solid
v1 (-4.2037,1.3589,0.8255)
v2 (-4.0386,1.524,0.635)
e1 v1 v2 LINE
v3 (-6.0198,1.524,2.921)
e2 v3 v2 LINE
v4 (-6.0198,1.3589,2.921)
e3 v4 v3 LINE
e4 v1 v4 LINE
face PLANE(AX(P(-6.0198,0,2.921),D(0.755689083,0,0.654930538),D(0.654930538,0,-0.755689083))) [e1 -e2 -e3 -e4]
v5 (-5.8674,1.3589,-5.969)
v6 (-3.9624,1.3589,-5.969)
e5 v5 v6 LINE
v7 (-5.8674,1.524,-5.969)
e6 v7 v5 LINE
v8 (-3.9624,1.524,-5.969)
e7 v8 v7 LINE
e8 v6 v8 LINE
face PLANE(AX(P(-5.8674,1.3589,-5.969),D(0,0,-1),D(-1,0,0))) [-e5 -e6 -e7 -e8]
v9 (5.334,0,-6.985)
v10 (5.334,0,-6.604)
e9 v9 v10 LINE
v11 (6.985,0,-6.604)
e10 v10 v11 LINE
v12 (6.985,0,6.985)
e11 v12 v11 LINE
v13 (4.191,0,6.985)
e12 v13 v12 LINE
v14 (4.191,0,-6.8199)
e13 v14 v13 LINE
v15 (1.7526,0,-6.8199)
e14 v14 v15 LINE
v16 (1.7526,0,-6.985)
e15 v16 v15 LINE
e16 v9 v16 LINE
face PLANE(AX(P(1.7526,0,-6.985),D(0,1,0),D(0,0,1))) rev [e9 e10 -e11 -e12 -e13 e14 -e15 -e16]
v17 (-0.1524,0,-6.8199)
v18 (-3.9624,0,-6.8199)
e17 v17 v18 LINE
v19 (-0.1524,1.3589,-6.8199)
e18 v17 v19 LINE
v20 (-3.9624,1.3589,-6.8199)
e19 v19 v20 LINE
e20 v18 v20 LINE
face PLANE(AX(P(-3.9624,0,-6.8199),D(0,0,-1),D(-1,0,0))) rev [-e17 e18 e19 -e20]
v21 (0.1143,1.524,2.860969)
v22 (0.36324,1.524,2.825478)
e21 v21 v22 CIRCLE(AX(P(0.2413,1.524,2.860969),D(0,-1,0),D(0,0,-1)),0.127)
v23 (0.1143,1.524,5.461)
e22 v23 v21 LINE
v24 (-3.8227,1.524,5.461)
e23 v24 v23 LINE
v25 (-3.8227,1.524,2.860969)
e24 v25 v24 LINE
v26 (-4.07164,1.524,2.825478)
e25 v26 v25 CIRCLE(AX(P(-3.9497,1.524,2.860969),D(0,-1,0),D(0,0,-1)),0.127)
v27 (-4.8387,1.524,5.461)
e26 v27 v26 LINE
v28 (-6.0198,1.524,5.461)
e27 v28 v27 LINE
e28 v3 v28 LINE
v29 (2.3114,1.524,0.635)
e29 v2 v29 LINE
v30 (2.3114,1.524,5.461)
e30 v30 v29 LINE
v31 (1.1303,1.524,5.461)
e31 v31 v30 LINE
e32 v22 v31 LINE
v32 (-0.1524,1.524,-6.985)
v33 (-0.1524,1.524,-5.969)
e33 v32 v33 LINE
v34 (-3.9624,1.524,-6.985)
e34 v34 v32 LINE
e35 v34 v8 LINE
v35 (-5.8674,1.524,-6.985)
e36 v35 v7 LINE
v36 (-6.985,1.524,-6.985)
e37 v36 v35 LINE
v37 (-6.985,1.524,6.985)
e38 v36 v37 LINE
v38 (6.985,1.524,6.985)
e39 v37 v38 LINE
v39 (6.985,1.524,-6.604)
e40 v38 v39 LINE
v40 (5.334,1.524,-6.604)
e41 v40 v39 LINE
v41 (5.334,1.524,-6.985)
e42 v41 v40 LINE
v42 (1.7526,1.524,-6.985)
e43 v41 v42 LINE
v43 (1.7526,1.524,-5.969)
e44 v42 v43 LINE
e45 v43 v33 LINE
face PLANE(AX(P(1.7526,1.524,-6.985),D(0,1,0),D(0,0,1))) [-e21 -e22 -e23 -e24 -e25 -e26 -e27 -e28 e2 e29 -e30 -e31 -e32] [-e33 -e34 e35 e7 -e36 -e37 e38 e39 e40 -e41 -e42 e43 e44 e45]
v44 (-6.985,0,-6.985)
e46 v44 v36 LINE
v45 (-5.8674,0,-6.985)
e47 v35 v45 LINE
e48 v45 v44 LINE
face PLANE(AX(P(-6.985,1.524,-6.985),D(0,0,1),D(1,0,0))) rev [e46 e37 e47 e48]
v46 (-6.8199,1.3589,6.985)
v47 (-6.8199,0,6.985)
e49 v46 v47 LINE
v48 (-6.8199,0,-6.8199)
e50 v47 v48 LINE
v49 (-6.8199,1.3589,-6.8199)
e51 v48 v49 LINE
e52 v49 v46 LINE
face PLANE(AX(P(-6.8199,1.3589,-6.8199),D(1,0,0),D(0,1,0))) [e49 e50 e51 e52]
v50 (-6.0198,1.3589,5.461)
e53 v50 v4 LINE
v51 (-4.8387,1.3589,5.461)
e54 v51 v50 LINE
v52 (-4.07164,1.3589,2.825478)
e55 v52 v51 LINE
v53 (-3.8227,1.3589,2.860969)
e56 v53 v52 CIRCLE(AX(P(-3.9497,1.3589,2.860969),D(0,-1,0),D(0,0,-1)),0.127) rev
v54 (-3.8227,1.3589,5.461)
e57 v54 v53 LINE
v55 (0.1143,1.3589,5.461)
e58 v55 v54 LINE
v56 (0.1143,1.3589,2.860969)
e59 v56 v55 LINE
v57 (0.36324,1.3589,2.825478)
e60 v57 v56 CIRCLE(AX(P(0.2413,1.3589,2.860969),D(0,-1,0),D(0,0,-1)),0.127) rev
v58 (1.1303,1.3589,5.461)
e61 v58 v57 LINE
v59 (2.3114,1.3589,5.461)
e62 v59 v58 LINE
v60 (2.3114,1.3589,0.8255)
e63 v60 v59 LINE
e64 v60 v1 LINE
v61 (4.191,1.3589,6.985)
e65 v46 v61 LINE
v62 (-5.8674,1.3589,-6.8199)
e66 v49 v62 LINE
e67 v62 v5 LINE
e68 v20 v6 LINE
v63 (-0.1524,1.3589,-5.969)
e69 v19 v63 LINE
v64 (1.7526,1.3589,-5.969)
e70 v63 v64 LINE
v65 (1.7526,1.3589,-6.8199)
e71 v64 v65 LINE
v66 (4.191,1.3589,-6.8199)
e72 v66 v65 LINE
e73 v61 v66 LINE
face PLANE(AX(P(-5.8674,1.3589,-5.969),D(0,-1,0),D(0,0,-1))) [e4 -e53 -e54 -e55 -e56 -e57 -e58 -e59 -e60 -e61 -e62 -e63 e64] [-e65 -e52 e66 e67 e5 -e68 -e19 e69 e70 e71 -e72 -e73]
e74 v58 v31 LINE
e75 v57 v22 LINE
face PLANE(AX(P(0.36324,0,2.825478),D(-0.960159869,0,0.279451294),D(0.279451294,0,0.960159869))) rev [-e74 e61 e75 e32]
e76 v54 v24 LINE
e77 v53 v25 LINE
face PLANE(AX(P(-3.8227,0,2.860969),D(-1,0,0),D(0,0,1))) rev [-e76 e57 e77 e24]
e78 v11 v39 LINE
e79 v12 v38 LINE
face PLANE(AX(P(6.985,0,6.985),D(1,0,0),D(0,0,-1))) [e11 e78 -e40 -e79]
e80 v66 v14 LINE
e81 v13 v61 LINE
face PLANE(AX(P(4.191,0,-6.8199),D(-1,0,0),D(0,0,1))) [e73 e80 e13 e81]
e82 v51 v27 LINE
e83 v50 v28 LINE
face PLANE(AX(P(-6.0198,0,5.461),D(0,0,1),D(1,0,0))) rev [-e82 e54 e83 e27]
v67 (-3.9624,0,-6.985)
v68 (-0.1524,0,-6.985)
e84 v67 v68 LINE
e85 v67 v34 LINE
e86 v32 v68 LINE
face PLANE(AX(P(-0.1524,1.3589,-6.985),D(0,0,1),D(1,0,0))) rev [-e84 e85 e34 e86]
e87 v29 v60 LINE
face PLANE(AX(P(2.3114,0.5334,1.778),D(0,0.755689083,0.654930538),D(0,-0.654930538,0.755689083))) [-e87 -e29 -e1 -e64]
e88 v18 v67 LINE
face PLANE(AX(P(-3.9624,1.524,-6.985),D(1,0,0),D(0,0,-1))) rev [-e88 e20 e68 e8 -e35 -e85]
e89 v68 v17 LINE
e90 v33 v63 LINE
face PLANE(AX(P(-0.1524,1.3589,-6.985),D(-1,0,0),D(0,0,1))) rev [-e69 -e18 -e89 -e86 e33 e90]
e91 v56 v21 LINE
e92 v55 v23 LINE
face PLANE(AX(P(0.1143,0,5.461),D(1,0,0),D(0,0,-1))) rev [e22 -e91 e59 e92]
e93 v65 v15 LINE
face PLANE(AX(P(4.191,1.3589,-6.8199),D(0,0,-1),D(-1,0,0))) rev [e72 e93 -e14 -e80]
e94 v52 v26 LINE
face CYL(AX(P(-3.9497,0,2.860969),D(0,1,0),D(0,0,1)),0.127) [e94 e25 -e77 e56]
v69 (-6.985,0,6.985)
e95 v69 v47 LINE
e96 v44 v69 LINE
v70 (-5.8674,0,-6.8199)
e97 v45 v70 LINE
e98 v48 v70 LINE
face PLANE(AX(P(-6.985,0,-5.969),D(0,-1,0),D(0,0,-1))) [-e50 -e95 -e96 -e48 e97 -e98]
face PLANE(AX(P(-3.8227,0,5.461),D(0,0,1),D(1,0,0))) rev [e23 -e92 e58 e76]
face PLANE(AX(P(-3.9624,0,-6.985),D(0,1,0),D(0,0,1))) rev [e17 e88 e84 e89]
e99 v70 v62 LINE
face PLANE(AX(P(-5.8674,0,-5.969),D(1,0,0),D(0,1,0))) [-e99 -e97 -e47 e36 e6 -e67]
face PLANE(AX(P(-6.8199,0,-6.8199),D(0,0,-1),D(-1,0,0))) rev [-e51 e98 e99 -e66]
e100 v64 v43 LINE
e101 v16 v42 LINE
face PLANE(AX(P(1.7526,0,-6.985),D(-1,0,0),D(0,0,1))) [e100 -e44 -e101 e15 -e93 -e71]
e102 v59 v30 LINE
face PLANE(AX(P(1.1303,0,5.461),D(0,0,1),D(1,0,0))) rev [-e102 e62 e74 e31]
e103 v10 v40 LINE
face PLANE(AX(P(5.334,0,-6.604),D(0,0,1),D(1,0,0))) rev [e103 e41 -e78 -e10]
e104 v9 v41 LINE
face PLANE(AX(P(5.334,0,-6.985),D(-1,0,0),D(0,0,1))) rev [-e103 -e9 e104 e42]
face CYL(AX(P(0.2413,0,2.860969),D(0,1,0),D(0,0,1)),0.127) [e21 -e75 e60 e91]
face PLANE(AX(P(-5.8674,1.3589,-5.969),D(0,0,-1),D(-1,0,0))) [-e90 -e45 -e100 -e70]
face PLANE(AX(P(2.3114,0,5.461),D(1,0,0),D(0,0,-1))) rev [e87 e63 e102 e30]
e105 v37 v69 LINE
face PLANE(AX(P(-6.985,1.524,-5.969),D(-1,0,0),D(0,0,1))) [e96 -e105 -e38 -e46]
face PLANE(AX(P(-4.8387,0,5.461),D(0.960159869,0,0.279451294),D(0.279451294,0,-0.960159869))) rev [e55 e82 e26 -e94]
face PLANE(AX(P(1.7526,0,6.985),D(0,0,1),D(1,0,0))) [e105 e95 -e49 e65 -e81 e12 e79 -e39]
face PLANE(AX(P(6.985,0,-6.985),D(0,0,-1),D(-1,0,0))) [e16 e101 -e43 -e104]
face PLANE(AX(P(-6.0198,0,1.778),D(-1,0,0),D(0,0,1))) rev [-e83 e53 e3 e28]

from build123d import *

# Parameters (mm, degrees)
SKETCH1_W           = 5.2324
SKETCH1_H           = 13.97
BOSS_EXTRUDE1_DEPTH = 1.524
BOSS_EXTRUDE2_DEPTH = 12.954
SKETCH3_W           = 1.1176
SKETCH3_H           = 1.524
BOSS_EXTRUDE3_DEPTH = 1.016
SKETCH4_W           = 3.81
SKETCH4_H           = 0.1651
BOSS_EXTRUDE4_DEPTH = 1.016
SKETCH5_W           = 3.81
SKETCH5_H           = 0.1651
BOSS_EXTRUDE5_DEPTH = 1.3589
SKETCH6_W           = 13.8049
SKETCH6_H           = 1.3589
CUT_EXTRUDE1_DEPTH  = 0.9525
SKETCH7_W           = 13.8049
SKETCH7_H           = 1.3589
CUT_EXTRUDE2_DEPTH  = 2.4384
SKETCH8_W           = 1.651
SKETCH8_H           = 0.381
CUT_EXTRUDE3_DEPTH  = 1.524
CUT_EXTRUDE4_DEPTH  = 10.995150124
CHAMFER1_SIZE       = 1.143
CHAMFER1_SIZE2      = 0.9906
CHAMFER2_SIZE       = 1.143
CHAMFER2_SIZE_2     = 0.9906


with BuildPart() as part:
    # Sketch1 → Boss-Extrude1 (new body)
    with BuildSketch(Plane(origin=(0, 1.524, 0), x_dir=(-1, 0, 0), z_dir=(0, 1, 0))):
        with Locations((-4.3688, 0)):
            Rectangle(SKETCH1_W, SKETCH1_H)
    extrude(amount=-BOSS_EXTRUDE1_DEPTH)

    # Sketch2 → Boss-Extrude2 (add)
    with BuildSketch(Plane.XY.offset(6.985)):
        Polygon((-5.8674, 1.3589), (1.7526, 1.3589), (1.7526, 1.524), (-6.985, 1.524), (-6.985, 0), (-5.8674, 0), align=None)
    extrude(amount=-BOSS_EXTRUDE2_DEPTH)

    # Sketch3 → Boss-Extrude3 (add)
    with BuildSketch(Plane(origin=(0, 0, -5.969), x_dir=(-1, 0, 0), z_dir=(0, 0, -1))):
        with Locations((6.4262, 0.762)):
            Rectangle(SKETCH3_W, SKETCH3_H)
    extrude(amount=BOSS_EXTRUDE3_DEPTH)

    # Sketch4 → Boss-Extrude4 (add)
    with BuildSketch(Plane(origin=(0, 0, -5.969), x_dir=(-1, 0, 0), z_dir=(0, 0, -1))):
        with Locations((2.0574, 1.44145)):
            Rectangle(SKETCH4_W, SKETCH4_H)
    extrude(amount=BOSS_EXTRUDE4_DEPTH)

    # Sketch5 → Boss-Extrude5 (add)
    with BuildSketch(Plane.XZ.offset(-1.3589)):
        with Locations((-2.0574, -6.90245)):
            Rectangle(SKETCH5_W, SKETCH5_H)
    extrude(amount=BOSS_EXTRUDE5_DEPTH)

    # Sketch6 → Cut-Extrude1 (cut)
    with BuildSketch(Plane(origin=(-5.8674, 0, 0), x_dir=(0, 0, -1), z_dir=(1, 0, 0))):
        with Locations((-0.08255, 0.67945)):
            Rectangle(SKETCH6_W, SKETCH6_H)
    extrude(amount=-CUT_EXTRUDE1_DEPTH, mode=Mode.SUBTRACT)

    # Sketch7 → Cut-Extrude2 (cut)
    with BuildSketch(Plane.ZY.offset(-1.7526)):
        with Locations((0.08255, 0.67945)):
            Rectangle(SKETCH7_W, SKETCH7_H)
    extrude(amount=-CUT_EXTRUDE2_DEPTH, mode=Mode.SUBTRACT)

    # Sketch8 → Cut-Extrude3 (cut)
    with BuildSketch(Plane(origin=(0, 1.524, 0), x_dir=(-1, 0, 0), z_dir=(0, 1, 0))):
        with Locations((-6.1595, -6.7945)):
            Rectangle(SKETCH8_W, SKETCH8_H)
    extrude(amount=-CUT_EXTRUDE3_DEPTH, mode=Mode.SUBTRACT)

    # Sketch9 → Cut-Extrude4 (cut, through all)
    with BuildSketch(Plane(origin=(0, 1.524, 0), x_dir=(-1, 0, 0), z_dir=(0, 1, 0))):
        with BuildLine():
            Line((3.8227, 2.860968655), (3.8227, 5.461))
            Line((3.8227, 5.461), (-0.1143, 5.461))
            Line((-0.1143, 5.461), (-0.1143, 2.860968655))
            ThreePointArc((-0.1143, 2.860968655), (-0.223375415, 2.735239942), (-0.363240303, 2.825478341))
            Line((-0.363240303, 2.825478341), (-1.1303, 5.461))
            Line((-1.1303, 5.461), (-2.3114, 5.461))
            Line((-2.3114, 5.461), (-2.3114, 1.778))
            Line((-2.3114, 1.778), (6.0198, 1.778))
            Line((6.0198, 1.778), (6.0198, 5.461))
            Line((6.0198, 5.461), (4.8387, 5.461))
            Line((4.8387, 5.461), (4.071640303, 2.825478341))
            ThreePointArc((4.071640303, 2.825478341), (3.931775415, 2.735239942), (3.8227, 2.860968655))
        make_face()
    extrude(amount=-CUT_EXTRUDE4_DEPTH, mode=Mode.SUBTRACT)

    # Chamfer1
    chamfer1_edges = [part.edges().sort_by_distance(p)[0] for p in [
        (-6.0198, 1.44145, 1.778),
    ]]
    chamfer1_side = [part.faces().sort_by_distance(p)[0] for p in [
        (-6.0198, 1.44145, 3.6195),
    ]]
    chamfer(chamfer1_edges, length=CHAMFER1_SIZE, length2=CHAMFER1_SIZE2, reference=chamfer1_side[0])

    # Chamfer2
    # the kernel refuses this chamfer: 1.143, 0.9906 mm, written as the material it takes off along each edge
    with BuildSketch(Plane(origin=(2.3114, 1.524, 1.778), x_dir=(0, 0.025420360363461764, -0.9996768504266725), z_dir=(-1, 0, 0))) as chamfer2_piece_1_section:
        Polygon((CHAMFER2_SIZE * 0.999676850427, CHAMFER2_SIZE * 0.0254203603635), (-CHAMFER2_SIZE_2 * 0.0254203603635, CHAMFER2_SIZE_2 * 0.999676850427), (0, 0), align=None)
    chamfer2_piece_1 = extrude(amount=10.285426882, mode=Mode.PRIVATE)
    chamfer2_piece_1 = split(chamfer2_piece_1, bisect_by=Plane(origin=(-3.105218089, 1.443787017, -0.441979128), z_dir=(0.7556890827898172, 0, 0.6549305384178423)), keep=Keep.TOP, mode=Mode.PRIVATE)
    add(chamfer2_piece_1, mode=Mode.SUBTRACT)


solid = part.part
